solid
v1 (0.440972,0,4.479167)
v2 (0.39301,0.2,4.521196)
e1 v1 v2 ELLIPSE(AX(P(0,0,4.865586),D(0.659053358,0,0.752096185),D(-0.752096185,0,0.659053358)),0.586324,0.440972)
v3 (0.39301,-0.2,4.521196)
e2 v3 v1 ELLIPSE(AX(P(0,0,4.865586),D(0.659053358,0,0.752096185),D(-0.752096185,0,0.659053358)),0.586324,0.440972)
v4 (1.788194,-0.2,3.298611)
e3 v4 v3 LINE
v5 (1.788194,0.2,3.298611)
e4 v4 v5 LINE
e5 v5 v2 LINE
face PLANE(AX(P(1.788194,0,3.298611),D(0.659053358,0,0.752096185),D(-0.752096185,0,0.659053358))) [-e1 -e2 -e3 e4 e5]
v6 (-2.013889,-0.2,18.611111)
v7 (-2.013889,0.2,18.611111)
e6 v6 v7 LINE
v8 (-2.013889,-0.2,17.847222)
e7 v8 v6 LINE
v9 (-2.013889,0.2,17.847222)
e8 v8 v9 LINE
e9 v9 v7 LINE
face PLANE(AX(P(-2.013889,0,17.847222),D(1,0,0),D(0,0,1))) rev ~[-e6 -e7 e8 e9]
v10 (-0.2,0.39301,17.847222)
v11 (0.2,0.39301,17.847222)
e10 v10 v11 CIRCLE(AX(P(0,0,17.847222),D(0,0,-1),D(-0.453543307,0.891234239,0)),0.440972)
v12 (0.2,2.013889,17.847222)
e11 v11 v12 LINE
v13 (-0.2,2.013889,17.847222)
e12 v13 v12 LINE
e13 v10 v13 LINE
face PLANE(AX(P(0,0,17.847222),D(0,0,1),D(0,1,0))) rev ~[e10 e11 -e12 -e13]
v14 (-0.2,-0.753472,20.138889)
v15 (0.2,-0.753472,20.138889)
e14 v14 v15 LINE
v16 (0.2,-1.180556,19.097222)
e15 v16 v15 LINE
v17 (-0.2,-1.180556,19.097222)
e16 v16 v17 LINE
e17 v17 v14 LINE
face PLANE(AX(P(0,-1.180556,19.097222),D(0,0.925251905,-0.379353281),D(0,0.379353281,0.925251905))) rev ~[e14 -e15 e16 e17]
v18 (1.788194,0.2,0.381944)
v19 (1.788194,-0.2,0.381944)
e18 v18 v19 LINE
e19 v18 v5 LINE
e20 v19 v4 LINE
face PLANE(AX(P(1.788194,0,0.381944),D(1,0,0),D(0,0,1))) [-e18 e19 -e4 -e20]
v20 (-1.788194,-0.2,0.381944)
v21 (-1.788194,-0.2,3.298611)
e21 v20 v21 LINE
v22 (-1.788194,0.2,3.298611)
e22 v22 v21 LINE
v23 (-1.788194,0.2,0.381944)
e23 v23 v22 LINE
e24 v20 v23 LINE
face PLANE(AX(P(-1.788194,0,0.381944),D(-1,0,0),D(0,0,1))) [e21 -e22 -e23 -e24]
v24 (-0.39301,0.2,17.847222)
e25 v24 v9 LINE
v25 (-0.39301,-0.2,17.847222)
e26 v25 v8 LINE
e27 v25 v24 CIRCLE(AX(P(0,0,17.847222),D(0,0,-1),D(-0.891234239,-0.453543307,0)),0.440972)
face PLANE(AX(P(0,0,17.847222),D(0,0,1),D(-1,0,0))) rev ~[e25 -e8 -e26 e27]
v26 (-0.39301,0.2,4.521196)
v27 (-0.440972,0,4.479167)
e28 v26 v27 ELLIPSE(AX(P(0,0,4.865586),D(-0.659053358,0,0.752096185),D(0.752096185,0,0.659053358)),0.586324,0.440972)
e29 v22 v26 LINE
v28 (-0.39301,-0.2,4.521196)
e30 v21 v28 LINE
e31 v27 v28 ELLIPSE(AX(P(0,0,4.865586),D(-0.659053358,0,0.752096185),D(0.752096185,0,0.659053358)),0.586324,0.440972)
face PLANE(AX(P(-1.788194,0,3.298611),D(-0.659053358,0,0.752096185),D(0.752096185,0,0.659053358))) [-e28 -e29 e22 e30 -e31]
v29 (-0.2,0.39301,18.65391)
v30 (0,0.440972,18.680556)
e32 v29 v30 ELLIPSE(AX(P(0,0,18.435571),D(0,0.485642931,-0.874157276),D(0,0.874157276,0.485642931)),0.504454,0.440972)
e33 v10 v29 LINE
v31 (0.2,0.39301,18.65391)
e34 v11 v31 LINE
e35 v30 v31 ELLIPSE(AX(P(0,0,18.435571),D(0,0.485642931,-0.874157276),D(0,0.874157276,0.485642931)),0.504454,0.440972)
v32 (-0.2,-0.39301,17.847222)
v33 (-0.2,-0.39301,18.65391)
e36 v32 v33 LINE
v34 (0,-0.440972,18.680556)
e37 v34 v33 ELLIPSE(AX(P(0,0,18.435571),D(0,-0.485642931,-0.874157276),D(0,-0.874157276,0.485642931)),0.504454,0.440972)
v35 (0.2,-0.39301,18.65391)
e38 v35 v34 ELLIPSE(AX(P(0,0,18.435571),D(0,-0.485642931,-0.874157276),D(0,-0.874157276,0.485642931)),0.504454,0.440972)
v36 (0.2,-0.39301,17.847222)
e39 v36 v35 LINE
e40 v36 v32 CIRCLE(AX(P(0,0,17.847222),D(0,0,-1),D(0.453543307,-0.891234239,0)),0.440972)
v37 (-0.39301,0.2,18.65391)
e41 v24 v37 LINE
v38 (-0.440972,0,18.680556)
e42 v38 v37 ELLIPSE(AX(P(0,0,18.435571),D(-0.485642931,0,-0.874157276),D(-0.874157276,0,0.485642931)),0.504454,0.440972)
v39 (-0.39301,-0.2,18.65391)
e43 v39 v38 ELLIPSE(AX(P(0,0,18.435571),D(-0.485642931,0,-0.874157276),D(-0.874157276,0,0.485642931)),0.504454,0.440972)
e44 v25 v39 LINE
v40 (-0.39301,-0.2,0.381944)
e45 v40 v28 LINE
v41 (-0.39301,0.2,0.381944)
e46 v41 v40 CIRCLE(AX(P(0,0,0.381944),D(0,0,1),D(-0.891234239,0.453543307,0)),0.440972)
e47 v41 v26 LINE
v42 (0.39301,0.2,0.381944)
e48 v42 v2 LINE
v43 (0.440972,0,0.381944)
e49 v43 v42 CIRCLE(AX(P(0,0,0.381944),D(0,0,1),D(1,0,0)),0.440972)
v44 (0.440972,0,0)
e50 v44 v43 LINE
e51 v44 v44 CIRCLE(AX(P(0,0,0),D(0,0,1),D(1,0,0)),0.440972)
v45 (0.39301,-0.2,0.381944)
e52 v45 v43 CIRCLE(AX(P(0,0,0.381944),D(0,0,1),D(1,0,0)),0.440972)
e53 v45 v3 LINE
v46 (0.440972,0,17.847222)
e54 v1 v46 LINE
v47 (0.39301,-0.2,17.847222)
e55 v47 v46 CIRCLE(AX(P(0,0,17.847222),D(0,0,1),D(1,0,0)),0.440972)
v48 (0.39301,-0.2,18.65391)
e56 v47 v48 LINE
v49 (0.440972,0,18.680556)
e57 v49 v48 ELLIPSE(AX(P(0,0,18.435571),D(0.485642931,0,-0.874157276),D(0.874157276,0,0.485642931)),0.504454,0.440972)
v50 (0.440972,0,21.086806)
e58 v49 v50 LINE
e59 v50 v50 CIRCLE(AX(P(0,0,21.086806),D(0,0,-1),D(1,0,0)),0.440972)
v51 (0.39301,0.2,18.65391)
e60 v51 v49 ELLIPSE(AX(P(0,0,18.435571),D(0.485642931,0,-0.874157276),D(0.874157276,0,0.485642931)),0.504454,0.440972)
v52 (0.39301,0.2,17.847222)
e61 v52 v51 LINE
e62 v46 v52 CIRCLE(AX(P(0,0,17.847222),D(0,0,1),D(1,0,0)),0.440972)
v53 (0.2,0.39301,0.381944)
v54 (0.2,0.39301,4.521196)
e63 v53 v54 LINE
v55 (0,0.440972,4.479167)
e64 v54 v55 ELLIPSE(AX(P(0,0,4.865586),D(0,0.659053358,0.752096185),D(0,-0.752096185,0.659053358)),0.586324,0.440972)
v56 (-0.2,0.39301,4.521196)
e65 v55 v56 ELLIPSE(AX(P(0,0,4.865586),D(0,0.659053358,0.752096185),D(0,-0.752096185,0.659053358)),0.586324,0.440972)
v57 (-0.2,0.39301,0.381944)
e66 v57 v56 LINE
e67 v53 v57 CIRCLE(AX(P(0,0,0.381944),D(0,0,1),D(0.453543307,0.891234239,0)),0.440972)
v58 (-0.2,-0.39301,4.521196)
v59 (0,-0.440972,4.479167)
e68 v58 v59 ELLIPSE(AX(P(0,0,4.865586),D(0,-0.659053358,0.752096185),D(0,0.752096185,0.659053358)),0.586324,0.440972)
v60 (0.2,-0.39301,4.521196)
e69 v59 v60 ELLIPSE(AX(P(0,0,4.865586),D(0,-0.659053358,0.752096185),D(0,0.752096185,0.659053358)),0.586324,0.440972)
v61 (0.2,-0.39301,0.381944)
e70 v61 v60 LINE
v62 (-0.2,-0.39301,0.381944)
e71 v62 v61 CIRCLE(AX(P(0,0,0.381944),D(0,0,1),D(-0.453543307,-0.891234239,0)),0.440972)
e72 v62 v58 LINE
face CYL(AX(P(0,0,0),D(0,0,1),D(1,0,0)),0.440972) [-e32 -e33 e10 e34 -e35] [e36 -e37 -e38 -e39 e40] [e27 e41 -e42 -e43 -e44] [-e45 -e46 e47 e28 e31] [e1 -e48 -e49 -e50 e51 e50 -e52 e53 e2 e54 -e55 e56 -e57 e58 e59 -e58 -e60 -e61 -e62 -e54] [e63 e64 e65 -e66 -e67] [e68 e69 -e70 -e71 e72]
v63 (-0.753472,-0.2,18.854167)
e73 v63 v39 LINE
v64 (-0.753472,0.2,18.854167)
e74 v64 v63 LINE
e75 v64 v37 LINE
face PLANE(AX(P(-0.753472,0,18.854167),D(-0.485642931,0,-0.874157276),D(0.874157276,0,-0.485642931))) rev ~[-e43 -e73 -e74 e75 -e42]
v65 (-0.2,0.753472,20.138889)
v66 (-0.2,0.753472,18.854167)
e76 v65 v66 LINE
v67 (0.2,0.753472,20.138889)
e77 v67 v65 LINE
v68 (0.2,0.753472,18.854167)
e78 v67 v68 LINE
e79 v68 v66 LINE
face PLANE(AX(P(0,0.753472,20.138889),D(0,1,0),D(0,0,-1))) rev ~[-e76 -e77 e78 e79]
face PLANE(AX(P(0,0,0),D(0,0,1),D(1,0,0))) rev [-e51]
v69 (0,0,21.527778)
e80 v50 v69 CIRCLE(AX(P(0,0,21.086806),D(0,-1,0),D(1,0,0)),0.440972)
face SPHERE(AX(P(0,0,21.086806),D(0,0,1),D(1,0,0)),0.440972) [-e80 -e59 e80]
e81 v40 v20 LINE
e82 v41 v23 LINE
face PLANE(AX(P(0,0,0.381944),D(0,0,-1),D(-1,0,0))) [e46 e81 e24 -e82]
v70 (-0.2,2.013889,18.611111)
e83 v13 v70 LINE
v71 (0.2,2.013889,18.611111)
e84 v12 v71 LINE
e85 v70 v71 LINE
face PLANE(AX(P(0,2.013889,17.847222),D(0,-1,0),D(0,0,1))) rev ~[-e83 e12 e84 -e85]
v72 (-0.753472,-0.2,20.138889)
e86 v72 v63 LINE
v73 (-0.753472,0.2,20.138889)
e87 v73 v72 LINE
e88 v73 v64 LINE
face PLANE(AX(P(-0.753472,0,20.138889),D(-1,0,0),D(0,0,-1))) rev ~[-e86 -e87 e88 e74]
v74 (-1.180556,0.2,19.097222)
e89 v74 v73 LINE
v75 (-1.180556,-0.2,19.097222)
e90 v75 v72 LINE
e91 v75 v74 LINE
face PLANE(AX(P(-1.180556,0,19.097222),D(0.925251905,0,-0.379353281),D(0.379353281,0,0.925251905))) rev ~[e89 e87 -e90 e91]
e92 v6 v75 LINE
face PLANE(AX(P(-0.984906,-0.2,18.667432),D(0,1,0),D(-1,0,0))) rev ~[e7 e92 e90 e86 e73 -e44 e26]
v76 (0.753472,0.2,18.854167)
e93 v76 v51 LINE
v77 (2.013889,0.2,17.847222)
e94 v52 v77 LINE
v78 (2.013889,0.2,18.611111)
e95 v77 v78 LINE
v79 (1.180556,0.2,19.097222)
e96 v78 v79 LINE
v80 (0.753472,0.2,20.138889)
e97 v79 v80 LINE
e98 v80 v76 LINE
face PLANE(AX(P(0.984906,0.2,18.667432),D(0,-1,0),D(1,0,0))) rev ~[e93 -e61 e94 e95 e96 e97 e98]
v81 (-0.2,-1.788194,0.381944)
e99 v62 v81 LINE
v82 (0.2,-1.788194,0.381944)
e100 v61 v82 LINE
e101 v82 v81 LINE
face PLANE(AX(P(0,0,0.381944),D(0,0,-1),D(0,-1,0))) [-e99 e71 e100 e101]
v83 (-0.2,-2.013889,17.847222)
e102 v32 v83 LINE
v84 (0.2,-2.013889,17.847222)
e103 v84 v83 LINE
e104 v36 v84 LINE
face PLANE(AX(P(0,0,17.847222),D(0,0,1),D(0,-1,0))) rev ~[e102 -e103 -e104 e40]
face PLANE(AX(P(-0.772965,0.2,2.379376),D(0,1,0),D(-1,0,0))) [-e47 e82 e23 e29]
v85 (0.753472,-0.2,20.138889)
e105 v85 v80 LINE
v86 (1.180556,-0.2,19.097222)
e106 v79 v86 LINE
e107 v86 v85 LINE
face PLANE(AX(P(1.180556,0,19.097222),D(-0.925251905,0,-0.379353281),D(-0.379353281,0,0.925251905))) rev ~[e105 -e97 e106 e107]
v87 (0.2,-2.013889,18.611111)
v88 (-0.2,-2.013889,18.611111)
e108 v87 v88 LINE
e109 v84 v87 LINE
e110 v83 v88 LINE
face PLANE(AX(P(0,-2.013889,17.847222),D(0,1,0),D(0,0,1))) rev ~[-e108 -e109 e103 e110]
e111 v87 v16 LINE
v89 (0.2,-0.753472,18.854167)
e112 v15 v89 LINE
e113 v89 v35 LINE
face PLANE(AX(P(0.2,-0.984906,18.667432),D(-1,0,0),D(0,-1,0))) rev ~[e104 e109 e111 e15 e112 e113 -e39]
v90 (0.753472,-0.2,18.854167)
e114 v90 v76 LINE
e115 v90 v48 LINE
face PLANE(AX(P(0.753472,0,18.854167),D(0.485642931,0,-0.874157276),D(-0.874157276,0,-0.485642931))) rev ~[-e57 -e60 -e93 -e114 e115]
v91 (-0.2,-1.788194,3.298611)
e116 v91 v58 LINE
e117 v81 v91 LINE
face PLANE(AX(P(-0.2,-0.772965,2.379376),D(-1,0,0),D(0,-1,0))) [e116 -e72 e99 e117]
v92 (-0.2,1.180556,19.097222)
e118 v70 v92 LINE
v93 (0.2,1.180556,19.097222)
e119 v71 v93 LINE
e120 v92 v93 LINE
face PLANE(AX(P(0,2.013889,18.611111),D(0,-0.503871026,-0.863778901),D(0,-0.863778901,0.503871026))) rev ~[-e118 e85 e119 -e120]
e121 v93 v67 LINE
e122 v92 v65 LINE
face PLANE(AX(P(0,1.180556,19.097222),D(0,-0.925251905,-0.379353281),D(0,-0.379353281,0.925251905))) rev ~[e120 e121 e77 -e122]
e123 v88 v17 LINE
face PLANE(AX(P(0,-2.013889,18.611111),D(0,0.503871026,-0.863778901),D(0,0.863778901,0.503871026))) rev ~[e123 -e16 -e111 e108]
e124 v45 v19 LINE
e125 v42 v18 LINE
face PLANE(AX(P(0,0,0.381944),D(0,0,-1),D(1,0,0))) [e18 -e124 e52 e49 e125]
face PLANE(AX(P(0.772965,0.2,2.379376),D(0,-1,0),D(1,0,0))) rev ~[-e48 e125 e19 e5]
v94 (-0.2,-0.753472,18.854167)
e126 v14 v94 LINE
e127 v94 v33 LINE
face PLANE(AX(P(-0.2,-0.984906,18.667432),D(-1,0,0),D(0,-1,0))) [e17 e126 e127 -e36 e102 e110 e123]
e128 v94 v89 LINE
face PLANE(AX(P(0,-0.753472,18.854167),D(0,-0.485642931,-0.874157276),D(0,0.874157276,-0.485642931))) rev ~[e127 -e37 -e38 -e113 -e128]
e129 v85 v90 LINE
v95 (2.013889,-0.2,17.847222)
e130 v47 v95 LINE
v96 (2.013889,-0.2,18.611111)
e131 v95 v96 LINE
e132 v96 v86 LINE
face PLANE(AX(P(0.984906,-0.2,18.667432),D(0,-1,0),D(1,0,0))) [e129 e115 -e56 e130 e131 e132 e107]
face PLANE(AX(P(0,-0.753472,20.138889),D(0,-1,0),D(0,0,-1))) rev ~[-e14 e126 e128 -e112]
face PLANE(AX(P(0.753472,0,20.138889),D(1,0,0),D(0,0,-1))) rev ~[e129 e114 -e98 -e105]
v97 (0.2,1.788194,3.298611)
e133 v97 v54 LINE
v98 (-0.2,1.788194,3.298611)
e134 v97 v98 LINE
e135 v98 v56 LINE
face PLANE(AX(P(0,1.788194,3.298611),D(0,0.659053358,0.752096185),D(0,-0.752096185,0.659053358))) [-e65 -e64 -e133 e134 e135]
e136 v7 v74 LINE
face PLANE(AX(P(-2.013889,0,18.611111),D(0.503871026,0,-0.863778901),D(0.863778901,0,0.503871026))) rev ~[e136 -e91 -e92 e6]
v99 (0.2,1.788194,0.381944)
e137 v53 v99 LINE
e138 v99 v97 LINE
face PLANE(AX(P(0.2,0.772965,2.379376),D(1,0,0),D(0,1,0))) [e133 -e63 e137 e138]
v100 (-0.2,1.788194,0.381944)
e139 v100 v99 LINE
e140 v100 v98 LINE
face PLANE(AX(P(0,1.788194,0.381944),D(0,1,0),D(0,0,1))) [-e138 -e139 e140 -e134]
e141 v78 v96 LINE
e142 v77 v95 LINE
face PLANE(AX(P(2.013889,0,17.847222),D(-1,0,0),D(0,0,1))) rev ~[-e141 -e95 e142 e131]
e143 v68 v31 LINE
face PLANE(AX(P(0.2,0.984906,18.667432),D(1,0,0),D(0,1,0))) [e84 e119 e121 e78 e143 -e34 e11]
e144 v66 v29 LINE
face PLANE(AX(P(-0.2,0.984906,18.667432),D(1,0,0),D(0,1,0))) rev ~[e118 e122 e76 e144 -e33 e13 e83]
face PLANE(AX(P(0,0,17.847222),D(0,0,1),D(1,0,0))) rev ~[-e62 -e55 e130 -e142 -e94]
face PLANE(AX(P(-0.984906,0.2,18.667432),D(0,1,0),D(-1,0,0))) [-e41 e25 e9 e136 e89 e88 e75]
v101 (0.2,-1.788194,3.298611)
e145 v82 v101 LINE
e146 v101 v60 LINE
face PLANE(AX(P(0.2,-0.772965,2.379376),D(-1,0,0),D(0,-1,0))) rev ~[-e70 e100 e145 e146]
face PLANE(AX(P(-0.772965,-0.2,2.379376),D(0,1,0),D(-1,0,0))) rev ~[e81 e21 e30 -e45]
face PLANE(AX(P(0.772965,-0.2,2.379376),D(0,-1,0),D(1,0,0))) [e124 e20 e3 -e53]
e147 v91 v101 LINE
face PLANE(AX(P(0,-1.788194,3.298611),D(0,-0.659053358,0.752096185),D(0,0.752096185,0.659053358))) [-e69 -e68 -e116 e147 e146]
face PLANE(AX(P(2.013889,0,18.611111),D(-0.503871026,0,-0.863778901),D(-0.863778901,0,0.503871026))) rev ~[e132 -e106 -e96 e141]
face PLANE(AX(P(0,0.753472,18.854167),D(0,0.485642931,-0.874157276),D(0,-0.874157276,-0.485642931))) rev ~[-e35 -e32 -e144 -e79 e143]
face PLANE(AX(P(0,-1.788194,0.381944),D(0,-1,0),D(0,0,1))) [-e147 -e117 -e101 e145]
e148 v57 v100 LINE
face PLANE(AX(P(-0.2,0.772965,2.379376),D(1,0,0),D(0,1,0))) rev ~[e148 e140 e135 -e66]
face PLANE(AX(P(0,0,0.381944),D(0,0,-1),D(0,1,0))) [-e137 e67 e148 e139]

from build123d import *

# Parameters (mm, degrees)
F3_DEPTH = 0.2
F4_COUNT = 4


# Not quite as in the source:
# - a feature names something its author has since deleted; it is built from what else it names


with BuildPart() as f1:
    # F0 (on Front) → F1 (revolve)
    with BuildSketch(Plane.XZ):
        with BuildLine():
            Line((0, 21.5277777778), (0, 0))
            Line((0, 0), (0.4409722222, 0))
            Line((0.4409722222, 0), (0.4409722222, 21.0868055556))
            ThreePointArc((0.4409722222, 21.0868055556), (0.3118144486, 21.3986200042), (0, 21.5277777778))
        make_face()
    revolve(axis=Axis((0, 0, 10.7638888889), (0, 0, 1)))

    # F2 (on Front) → F3 (join, symmetric)
    with BuildSketch(Plane.XZ):
        Polygon((0, 18.4355709877), (0, 17.8472222222), (2.0138888889, 17.8472222222), (2.0138888889, 18.6111111111), (1.1805555556, 19.0972222222), (0.7534722222, 20.1388888889), (0.7534722222, 18.8541666667), align=None)
        Polygon((0, 4.8655856243), (0, 0.3819444444), (1.7881944444, 0.3819444444), (1.7881944444, 3.2986111111), align=None)
    extrude(amount=F3_DEPTH, both=True)

    # F4: F1 ×4 about axis
    f4_axis = Axis((0, 0, 0), (0, 0, 1))


with BuildPart() as f1_1:
    add(f1.part)
    for i in range(1, F4_COUNT):
        add(f1.part.rotate(f4_axis, i * 360 / F4_COUNT))


solid = f1_1.part
